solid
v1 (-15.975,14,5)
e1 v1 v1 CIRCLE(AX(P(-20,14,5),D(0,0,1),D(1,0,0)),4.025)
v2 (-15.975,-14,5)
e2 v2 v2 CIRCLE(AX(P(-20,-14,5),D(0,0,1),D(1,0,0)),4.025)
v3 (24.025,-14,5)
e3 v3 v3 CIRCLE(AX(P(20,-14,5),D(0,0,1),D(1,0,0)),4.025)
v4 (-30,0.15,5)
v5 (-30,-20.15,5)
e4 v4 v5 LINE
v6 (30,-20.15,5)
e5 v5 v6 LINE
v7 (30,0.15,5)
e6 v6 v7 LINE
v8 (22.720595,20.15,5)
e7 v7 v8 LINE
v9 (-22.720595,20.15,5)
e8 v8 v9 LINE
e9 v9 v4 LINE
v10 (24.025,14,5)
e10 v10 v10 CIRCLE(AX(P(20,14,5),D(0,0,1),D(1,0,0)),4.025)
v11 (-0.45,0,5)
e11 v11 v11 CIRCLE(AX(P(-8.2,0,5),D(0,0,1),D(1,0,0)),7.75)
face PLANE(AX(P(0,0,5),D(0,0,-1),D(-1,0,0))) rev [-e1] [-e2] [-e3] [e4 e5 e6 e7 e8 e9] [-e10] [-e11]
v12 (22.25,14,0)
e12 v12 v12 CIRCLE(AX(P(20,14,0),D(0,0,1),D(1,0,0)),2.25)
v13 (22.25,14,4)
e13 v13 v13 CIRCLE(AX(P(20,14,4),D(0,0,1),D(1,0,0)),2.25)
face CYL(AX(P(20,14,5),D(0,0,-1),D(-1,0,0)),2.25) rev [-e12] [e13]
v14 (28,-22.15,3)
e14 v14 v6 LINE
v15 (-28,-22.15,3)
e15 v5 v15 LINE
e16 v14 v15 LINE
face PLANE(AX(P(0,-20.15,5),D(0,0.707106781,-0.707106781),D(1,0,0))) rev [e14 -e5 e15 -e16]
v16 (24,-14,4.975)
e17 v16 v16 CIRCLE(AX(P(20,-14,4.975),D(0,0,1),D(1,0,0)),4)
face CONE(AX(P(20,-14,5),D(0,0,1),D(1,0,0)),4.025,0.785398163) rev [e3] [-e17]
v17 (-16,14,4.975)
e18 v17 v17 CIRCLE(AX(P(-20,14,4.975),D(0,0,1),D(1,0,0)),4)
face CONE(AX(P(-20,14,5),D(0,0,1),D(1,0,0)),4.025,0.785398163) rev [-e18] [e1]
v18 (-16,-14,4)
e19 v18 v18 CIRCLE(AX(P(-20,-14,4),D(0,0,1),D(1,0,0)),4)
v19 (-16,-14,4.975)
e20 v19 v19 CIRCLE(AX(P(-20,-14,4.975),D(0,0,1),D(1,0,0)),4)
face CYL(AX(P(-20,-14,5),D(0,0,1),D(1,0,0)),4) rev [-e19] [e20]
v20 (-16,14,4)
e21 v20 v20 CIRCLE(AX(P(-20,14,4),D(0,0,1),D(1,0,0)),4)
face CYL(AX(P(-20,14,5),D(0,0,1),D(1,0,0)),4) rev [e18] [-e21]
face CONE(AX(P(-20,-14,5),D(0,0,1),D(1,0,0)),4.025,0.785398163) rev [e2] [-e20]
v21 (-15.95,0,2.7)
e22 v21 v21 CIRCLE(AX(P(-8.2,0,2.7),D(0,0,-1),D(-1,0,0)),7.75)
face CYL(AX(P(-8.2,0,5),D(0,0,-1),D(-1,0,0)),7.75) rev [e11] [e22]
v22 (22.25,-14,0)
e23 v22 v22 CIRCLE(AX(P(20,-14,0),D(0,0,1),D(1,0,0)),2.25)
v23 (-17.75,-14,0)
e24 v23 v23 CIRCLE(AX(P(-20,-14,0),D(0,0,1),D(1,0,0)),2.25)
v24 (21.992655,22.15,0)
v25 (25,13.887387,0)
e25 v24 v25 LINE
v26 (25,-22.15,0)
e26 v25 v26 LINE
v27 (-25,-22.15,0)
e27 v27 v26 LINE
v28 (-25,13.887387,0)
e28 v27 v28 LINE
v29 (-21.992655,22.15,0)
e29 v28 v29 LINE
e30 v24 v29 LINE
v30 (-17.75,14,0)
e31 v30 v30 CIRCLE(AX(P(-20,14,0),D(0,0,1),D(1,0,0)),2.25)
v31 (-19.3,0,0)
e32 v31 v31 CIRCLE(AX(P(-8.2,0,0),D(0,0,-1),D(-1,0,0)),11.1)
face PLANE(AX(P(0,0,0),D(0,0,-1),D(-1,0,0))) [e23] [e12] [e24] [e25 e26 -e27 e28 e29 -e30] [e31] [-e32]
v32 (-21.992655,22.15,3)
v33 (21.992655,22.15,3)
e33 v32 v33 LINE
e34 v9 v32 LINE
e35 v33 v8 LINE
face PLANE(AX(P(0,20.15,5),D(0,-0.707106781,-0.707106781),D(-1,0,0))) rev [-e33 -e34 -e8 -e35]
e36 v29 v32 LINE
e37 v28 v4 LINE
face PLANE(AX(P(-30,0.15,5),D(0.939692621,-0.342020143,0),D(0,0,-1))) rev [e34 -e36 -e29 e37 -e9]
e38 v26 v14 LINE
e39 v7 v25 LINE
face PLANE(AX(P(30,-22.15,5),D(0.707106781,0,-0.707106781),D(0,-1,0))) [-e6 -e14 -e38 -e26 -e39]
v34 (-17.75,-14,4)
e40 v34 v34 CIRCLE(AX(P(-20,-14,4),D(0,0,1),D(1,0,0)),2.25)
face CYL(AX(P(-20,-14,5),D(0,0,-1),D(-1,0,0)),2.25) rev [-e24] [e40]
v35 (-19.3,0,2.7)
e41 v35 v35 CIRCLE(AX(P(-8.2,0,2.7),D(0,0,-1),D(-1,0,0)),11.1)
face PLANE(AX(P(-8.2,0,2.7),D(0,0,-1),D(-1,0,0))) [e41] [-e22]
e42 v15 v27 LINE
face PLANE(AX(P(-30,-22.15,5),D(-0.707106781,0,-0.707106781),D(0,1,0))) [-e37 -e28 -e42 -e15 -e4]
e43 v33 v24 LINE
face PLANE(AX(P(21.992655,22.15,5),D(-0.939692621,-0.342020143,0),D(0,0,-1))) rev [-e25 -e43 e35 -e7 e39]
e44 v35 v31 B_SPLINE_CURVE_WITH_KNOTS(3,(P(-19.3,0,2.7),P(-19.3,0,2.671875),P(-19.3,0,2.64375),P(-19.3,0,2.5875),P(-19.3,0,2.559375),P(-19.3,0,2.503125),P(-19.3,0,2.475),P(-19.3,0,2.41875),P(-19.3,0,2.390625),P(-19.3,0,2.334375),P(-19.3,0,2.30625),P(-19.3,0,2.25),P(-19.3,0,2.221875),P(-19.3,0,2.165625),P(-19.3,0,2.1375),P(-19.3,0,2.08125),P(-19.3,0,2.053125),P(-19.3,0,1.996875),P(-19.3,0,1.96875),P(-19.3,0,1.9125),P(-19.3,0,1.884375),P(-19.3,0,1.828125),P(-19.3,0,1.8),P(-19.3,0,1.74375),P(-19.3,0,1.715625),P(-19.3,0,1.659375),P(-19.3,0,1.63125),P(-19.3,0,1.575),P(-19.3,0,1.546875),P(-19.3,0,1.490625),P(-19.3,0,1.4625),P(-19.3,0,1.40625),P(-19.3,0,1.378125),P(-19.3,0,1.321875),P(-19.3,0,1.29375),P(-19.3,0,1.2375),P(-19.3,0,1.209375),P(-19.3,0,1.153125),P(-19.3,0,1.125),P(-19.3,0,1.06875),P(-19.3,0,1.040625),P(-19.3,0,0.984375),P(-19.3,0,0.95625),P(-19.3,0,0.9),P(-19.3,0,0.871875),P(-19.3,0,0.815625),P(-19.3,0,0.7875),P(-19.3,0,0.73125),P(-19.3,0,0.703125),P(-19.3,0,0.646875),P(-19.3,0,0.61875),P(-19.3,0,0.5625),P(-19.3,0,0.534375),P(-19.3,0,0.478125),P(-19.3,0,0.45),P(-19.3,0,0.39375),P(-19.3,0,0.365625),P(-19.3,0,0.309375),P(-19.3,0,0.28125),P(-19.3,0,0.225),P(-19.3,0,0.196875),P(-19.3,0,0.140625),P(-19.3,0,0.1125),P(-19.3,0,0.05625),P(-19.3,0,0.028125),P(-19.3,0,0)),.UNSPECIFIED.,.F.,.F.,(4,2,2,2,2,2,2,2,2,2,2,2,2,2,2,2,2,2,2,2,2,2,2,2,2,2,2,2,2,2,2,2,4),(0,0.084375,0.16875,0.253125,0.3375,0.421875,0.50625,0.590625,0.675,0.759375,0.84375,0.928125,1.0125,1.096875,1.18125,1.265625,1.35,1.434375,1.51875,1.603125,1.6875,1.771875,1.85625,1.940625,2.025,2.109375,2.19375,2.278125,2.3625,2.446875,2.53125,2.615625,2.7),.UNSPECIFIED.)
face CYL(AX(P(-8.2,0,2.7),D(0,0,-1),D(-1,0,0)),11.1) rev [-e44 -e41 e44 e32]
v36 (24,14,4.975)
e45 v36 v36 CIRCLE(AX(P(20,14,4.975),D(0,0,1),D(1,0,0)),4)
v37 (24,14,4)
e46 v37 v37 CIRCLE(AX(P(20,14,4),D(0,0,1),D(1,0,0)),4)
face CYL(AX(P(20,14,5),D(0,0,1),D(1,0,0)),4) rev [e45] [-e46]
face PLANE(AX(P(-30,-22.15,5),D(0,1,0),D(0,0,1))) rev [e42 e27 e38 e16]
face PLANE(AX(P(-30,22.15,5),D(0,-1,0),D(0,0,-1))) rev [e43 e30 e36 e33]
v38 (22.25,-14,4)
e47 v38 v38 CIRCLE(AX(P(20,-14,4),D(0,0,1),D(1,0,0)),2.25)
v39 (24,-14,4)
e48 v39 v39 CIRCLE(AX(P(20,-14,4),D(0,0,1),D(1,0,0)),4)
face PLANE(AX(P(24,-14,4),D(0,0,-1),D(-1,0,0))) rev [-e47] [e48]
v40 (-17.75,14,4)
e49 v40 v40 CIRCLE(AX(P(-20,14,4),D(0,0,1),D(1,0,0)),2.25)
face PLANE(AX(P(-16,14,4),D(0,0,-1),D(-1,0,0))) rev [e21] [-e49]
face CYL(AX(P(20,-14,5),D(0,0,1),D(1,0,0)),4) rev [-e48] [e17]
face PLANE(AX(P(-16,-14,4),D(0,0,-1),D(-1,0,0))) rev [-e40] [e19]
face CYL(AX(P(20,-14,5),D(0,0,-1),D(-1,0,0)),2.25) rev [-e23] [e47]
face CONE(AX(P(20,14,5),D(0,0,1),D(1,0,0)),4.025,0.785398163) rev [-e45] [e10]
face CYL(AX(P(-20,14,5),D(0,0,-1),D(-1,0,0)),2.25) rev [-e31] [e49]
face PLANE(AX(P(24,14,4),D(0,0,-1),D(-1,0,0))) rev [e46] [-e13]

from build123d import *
from OCP.BRepFilletAPI import BRepFilletAPI_MakeChamfer

# Parameters (mm, degrees)
SKETCH2_W                                    = 60
SKETCH2_H                                    = 44.3
SKETCH2_R                                    = 2.25
SKETCH2_R_2                                  = 7.75
BOSS_EXTRUDE1_DEPTH                          = 5
CBORE_FOR_M4_HEX_SOCKET_HEAD_CAP_SCR_2_COUNT = 2
CBORE_FOR_M4_HEX_SOCKET_HEAD_CAP_SCR_2_PITCH = 40
CBORE_FOR_M4_HEX_SOCKET_HEAD_CAP_SCR_3_COUNT = 2
CBORE_FOR_M4_HEX_SOCKET_HEAD_CAP_SCR_3_PITCH = 48.826222463
CBORE_FOR_M4_HEX_SOCKET_HEAD_CAP_SCR_4_COUNT = 2
CBORE_FOR_M4_HEX_SOCKET_HEAD_CAP_SCR_4_PITCH = 28
SKETCH7_R                                    = 11.1
CUT_EXTRUDE1_DEPTH                           = 2.7
CHAMFER2_SIZE                                = 22
CHAMFER2_SIZE2                               = 8.007345154
CHAMFER3_SIZE                                = 2
CHAMFER1_SIZE                                = 5


with BuildPart() as part:
    # Sketch2 → Boss-Extrude1 (new body)
    with BuildSketch(Plane.XY):
        Rectangle(SKETCH2_W, SKETCH2_H)
        with Locations((-20, 14)):
            Circle(SKETCH2_R, mode=Mode.SUBTRACT)
        with Locations((-20, -14)):
            Circle(SKETCH2_R, mode=Mode.SUBTRACT)
        with Locations((20, 14)):
            Circle(SKETCH2_R, mode=Mode.SUBTRACT)
        with Locations((20, -14)):
            Circle(SKETCH2_R, mode=Mode.SUBTRACT)
        with Locations((-8.2, 0)):
            Circle(SKETCH2_R_2, mode=Mode.SUBTRACT)
    extrude(amount=BOSS_EXTRUDE1_DEPTH)

    # Sketch4 → CBORE for M4 Hex Socket Head Cap Screw1 (revolve, cut)
    with BuildSketch(Plane(origin=(-20, 14, 5), x_dir=(0, -1, 0), z_dir=(1, 0, 0))):
        Polygon((0, 0), (0, 5), (2.25, 5), (2.25, 1), (4, 1), (4, 0.025), (4.025, 0), align=None)
    cbore_for_m4_hex_socket_head_cap_screw1 = revolve(axis=Axis((-20, 14, 11.35), (0, 0, -1)), mode=Mode.SUBTRACT)

    # CBORE for M4 Hex Socket Head Cap Scr 2: CBORE for M4 Hex Socket Head Cap Screw1 ×2
    with Locations(*[(i * CBORE_FOR_M4_HEX_SOCKET_HEAD_CAP_SCR_2_PITCH, 0, 0) for i in range(1, CBORE_FOR_M4_HEX_SOCKET_HEAD_CAP_SCR_2_COUNT)]):
        add(cbore_for_m4_hex_socket_head_cap_screw1, mode=Mode.SUBTRACT)

    # CBORE for M4 Hex Socket Head Cap Scr 3: CBORE for M4 Hex Socket Head Cap Screw1 ×2
    with Locations(*[Vector(0.8192319205190405, -0.5734623443633283, 0) * (i * CBORE_FOR_M4_HEX_SOCKET_HEAD_CAP_SCR_3_PITCH) for i in range(1, CBORE_FOR_M4_HEX_SOCKET_HEAD_CAP_SCR_3_COUNT)]):
        add(cbore_for_m4_hex_socket_head_cap_screw1, mode=Mode.SUBTRACT)

    # CBORE for M4 Hex Socket Head Cap Scr 4: CBORE for M4 Hex Socket Head Cap Screw1 ×2
    with Locations(*[(0, -i * CBORE_FOR_M4_HEX_SOCKET_HEAD_CAP_SCR_4_PITCH, 0) for i in range(1, CBORE_FOR_M4_HEX_SOCKET_HEAD_CAP_SCR_4_COUNT)]):
        add(cbore_for_m4_hex_socket_head_cap_screw1, mode=Mode.SUBTRACT)

    # Sketch7 → Cut-Extrude1 (cut)
    with BuildSketch(Plane(origin=(0, 0, 0), x_dir=(-1, 0, 0), z_dir=(0, 0, -1))):
        with Locations((8.2, 0)):
            Circle(SKETCH7_R)
    extrude(amount=-CUT_EXTRUDE1_DEPTH, mode=Mode.SUBTRACT)

    # Chamfer2: one chamfer whose edges measure the first distance from different faces: ONE call of the kernel's chamfer builder (chamfer() names one face for all edges)
    chamfer2_edges_1 = [part.edges().sort_by_distance(p)[0] for p in [
        (-30, 22.15, 2.5),
    ]]
    chamfer2_side_1 = [part.faces().sort_by_distance(p)[0] for p in [
        (-30, 0, 2.5),
    ]]
    chamfer2_edges_2 = [part.edges().sort_by_distance(p)[0] for p in [
        (30, 22.15, 2.5),
    ]]
    chamfer2_side_2 = [part.faces().sort_by_distance(p)[0] for p in [
        (30, 0, 2.5),
    ]]
    chamfer2 = BRepFilletAPI_MakeChamfer(part.part.solid().wrapped)
    for e in chamfer2_edges_1:
        chamfer2.Add(CHAMFER2_SIZE, CHAMFER2_SIZE2, e.wrapped, chamfer2_side_1[0].wrapped)  # the first distance lies on this face
    for e in chamfer2_edges_2:
        chamfer2.Add(CHAMFER2_SIZE, CHAMFER2_SIZE2, e.wrapped, chamfer2_side_2[0].wrapped)  # the first distance lies on this face
    add(Compound.cast(chamfer2.Shape()), mode=Mode.REPLACE)

    # Chamfer3
    chamfer3_edges = [part.edges().sort_by_distance(p)[0] for p in [
        (0, -22.15, 5),
        (0, 22.15, 5),
    ]]
    chamfer(chamfer3_edges, length=CHAMFER3_SIZE)

    # Chamfer1
    chamfer1_edges = [part.edges().sort_by_distance(p)[0] for p in [
        (-30, -11, 0),
        (30, -11, 0),
    ]]
    chamfer(chamfer1_edges, length=CHAMFER1_SIZE - 0.0001)  # a hair under: the kernel refuses the full size


solid = part.part
